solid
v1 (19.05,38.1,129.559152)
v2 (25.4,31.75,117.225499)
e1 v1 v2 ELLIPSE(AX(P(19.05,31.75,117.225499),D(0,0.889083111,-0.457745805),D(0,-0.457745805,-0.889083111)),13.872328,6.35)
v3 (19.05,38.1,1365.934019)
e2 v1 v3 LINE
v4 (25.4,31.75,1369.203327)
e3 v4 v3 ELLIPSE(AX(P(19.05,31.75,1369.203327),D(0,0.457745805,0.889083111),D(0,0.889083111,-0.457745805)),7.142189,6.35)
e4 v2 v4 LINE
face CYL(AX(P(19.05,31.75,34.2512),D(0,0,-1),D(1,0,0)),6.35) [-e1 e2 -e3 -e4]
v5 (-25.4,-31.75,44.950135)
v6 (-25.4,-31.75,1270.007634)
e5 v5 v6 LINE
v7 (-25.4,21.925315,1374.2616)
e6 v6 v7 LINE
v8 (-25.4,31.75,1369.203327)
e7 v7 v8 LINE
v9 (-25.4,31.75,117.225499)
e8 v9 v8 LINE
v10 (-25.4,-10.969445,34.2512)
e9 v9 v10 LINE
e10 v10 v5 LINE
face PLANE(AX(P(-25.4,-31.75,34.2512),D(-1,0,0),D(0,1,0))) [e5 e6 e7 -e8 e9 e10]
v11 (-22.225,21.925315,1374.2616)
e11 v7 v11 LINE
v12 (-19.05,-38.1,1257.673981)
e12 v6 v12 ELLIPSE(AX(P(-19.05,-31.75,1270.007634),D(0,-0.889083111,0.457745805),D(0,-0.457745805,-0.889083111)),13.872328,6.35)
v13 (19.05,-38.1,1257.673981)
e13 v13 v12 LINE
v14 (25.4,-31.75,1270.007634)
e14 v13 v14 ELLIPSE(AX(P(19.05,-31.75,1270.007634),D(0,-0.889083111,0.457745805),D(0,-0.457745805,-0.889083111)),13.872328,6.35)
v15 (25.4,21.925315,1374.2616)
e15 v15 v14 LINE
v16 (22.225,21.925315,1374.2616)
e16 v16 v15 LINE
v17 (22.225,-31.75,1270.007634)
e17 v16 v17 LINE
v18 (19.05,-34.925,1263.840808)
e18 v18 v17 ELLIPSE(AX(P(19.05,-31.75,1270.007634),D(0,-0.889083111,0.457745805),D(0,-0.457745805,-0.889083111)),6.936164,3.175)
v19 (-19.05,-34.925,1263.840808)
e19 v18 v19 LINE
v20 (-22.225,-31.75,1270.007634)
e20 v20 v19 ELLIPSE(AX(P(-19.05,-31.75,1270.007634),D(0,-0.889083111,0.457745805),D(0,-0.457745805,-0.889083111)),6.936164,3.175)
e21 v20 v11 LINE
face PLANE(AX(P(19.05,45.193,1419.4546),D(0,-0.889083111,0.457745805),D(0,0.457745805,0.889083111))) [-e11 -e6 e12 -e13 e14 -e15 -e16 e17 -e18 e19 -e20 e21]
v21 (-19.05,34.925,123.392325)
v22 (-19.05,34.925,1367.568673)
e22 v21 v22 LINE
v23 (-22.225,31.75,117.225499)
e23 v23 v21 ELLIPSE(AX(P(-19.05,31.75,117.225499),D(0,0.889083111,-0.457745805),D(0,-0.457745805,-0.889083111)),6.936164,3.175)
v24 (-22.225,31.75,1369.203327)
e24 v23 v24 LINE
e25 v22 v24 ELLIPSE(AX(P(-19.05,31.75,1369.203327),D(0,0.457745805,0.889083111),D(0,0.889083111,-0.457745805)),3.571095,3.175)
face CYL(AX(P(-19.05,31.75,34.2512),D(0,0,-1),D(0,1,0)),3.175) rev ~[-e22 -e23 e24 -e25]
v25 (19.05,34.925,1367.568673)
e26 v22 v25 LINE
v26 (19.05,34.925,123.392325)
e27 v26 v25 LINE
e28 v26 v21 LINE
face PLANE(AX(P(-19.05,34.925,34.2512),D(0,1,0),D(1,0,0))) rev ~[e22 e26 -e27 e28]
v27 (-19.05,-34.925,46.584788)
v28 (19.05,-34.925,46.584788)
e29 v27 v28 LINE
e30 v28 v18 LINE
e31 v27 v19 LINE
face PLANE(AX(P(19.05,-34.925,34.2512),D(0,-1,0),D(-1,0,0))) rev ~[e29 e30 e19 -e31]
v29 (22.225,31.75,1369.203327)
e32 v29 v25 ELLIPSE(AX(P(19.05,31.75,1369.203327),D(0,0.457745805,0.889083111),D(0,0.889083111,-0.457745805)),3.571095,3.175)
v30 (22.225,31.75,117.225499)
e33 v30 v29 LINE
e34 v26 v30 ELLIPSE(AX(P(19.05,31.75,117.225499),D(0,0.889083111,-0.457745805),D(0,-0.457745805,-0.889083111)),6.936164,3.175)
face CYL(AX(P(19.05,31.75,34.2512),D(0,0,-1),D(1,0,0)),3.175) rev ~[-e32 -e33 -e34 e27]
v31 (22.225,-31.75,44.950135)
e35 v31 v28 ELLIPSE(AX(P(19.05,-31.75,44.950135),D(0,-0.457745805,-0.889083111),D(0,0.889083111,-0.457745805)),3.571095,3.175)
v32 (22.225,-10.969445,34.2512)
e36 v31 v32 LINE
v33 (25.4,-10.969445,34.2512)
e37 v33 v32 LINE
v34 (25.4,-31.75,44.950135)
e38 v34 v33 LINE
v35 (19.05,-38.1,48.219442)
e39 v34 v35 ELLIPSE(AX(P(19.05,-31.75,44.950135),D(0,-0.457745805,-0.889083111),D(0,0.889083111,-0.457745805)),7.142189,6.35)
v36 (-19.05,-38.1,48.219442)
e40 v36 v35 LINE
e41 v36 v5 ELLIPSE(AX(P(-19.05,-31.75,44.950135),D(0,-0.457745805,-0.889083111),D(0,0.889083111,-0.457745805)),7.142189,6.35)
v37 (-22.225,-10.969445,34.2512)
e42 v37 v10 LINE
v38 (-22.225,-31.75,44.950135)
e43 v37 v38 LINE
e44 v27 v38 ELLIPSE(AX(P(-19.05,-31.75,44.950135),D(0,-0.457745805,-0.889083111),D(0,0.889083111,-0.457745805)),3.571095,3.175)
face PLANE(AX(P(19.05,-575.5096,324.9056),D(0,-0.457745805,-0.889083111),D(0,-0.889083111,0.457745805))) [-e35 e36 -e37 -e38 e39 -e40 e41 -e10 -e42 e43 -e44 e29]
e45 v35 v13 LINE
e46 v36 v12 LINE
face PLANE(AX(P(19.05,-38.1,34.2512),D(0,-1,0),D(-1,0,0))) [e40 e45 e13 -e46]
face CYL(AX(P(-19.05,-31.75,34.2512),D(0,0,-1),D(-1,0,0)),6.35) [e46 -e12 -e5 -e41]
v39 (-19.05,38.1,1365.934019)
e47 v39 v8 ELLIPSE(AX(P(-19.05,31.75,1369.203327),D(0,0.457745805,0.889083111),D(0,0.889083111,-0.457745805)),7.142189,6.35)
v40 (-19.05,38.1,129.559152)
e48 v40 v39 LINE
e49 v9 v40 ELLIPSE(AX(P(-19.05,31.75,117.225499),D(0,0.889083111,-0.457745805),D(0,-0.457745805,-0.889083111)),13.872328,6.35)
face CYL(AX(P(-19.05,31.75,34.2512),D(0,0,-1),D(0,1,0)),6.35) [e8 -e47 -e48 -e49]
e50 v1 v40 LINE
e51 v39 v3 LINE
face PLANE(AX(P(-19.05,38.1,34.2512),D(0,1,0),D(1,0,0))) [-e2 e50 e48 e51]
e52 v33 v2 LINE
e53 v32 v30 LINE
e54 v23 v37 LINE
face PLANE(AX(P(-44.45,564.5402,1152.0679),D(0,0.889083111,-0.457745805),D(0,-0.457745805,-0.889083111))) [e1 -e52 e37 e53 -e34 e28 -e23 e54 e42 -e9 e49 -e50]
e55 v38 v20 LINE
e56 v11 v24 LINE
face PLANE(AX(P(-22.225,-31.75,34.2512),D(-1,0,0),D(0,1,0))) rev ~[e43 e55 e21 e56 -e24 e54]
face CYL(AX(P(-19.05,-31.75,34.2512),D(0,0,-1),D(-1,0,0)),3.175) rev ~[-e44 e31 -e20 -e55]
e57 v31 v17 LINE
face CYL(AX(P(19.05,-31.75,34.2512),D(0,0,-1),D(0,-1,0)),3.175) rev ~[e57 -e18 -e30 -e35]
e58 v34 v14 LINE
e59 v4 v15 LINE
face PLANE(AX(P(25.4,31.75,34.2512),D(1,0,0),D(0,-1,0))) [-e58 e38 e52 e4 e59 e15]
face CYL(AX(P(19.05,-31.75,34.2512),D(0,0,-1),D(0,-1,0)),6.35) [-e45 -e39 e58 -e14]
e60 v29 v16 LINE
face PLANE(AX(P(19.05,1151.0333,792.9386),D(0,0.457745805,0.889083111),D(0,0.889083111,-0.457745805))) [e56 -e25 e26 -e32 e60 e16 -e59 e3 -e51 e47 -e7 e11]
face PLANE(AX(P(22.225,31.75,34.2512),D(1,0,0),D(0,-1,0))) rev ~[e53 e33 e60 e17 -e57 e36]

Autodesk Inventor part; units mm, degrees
ref_plane "Start Plane" through (0, 0, 34.2512) normal (0, 0, 1) x (1, 0, 0)
ref_plane "End Plane" through (0, 0, 1374.2616) normal (0, 0, 1) x (1, 0, 0)
sketch "Sketch" plane through (0, 0, 0) normal (0, 0, 1) x (1, 0, 0)
  line L0 (-25.4, -31.75) -> (-25.4, 31.75)
  line L1 (-19.05, 38.1) -> (19.05, 38.1)
  line L2 (25.4, 31.75) -> (25.4, -31.75)
  line L3 (19.05, -38.1) -> (-19.05, -38.1)
  arc A0 (-25.4, -31.75) -> (-19.05, -38.1) centre (-19.05, -31.75) ccw
  arc A1 (-19.05, 38.1) -> (-25.4, 31.75) centre (-19.05, 31.75) ccw
  arc A2 (25.4, 31.75) -> (19.05, 38.1) centre (19.05, 31.75) ccw
  arc A3 (19.05, -38.1) -> (25.4, -31.75) centre (19.05, -31.75) ccw
  arc A4 (-19.05, 34.925) -> (-22.225, 31.75) centre (-19.05, 31.75) ccw
  line L4 (-19.05, 34.925) -> (19.05, 34.925)
  arc A5 (22.225, 31.75) -> (19.05, 34.925) centre (19.05, 31.75) ccw
  line L5 (22.225, 31.75) -> (22.225, -31.75)
  arc A6 (19.05, -34.925) -> (22.225, -31.75) centre (19.05, -31.75) ccw
  line L6 (19.05, -34.925) -> (-19.05, -34.925)
  arc A7 (-22.225, -31.75) -> (-19.05, -34.925) centre (-19.05, -31.75) ccw
  line L7 (-22.225, -31.75) -> (-22.225, 31.75)
  line L8 (0, 55.1812) -> (0, -55.1812) construction
  line L9 (-37.4012, 0) -> (37.4012, 0) construction
  dimension "d10" = 76.2
  dimension "d11" = 50.8
  dimension "d12" = 3.175
  dimension "d15" = 38.1
  dimension "d16" = 25.4
  dimension "d17" = 6.35
extrude "Body" add sketch "Sketch" along normal up to surface (1340.0104 mm away) from surface at 34.2512
sketch "Sketch3" plane through (0, 0, 0) normal (0, 0, 1) x (1, 0, 0)
  line L0 (0, 0) -> (10, 0)
ref_plane "Work Plane3" through (0, 0, 0) normal (0, -1, 0) x (1, 0, 0)
ref_plane "Work Plane8" through (19.05, 45.193, 1419.4546) normal (0, -0.8890831, 0.4577458) x (1, 0, 0)
split "Split5" plane through (19.05, 45.193, 1419.4546) removes the side toward (0, -0.8890831, 0.4577458)
ref_plane "Work Plane9" through (19.05, 1151.0333, 792.9386) normal (0, 0.4577458, 0.8890831) x (1, 0, 0)
split "Split6" plane through (19.05, 1151.0333, 792.9386) removes the side toward (0, 0.4577458, 0.8890831)
ref_plane "Work Plane10" through (-44.45, 564.5402, 1152.0679) normal (0, 0.8890831, -0.4577458) x (1, 0, 0)
split "Split7" plane through (-44.45, 564.5402, 1152.0679) removes the side toward (0, 0.8890831, -0.4577458)
ref_plane "Work Plane11" through (19.05, -575.5096, 324.9056) normal (0, -0.4577458, -0.8890831) x (1, 0, 0)
split "Split8" plane through (19.05, -575.5096, 324.9056) removes the side toward (0, -0.4577458, -0.8890831)
sketch "Sketch4" plane through (0, 0, 0) normal (0, -1, 0) x (1, 0, 0)
  line L0 (-2, 34.2512) -> (12, 34.2512) projected
  line L1 (-2, 1374.2616) -> (12, 1374.2616) projected
  dimension "d19" = 1340.0104
equation "\"d10\" = G_H"
equation "\"d11\" = G_W"
equation "\"d12\" = G_T"
equation "\"d15\" = 0.5 * d10"
equation "\"d16\" = 0.5 * d11"
equation "\"d17\" = G_IR"
equation "\"d3\" = G_L"
equation "\"G_W\" = 50.8"
equation "\"G_H\" = 76.2"
equation "\"G_T\" = 3.175"
equation "\"G_IR\" = 6.35"
equation "\"G_L\" = d19"
equation "\"G_OFFSET_START\" = -34.25121"
equation "\"G_OFFSET_END\" = -68.46066"
equation "\"d13\" = -G_OFFSET_START"
equation "\"d14\" = G_OFFSET_END + B_L"
equation "\"B_L\" = 1442.72224"
properties part number "AISC - 3 x 2 x 1/8 - 52.756" material "Steel, Mild"
